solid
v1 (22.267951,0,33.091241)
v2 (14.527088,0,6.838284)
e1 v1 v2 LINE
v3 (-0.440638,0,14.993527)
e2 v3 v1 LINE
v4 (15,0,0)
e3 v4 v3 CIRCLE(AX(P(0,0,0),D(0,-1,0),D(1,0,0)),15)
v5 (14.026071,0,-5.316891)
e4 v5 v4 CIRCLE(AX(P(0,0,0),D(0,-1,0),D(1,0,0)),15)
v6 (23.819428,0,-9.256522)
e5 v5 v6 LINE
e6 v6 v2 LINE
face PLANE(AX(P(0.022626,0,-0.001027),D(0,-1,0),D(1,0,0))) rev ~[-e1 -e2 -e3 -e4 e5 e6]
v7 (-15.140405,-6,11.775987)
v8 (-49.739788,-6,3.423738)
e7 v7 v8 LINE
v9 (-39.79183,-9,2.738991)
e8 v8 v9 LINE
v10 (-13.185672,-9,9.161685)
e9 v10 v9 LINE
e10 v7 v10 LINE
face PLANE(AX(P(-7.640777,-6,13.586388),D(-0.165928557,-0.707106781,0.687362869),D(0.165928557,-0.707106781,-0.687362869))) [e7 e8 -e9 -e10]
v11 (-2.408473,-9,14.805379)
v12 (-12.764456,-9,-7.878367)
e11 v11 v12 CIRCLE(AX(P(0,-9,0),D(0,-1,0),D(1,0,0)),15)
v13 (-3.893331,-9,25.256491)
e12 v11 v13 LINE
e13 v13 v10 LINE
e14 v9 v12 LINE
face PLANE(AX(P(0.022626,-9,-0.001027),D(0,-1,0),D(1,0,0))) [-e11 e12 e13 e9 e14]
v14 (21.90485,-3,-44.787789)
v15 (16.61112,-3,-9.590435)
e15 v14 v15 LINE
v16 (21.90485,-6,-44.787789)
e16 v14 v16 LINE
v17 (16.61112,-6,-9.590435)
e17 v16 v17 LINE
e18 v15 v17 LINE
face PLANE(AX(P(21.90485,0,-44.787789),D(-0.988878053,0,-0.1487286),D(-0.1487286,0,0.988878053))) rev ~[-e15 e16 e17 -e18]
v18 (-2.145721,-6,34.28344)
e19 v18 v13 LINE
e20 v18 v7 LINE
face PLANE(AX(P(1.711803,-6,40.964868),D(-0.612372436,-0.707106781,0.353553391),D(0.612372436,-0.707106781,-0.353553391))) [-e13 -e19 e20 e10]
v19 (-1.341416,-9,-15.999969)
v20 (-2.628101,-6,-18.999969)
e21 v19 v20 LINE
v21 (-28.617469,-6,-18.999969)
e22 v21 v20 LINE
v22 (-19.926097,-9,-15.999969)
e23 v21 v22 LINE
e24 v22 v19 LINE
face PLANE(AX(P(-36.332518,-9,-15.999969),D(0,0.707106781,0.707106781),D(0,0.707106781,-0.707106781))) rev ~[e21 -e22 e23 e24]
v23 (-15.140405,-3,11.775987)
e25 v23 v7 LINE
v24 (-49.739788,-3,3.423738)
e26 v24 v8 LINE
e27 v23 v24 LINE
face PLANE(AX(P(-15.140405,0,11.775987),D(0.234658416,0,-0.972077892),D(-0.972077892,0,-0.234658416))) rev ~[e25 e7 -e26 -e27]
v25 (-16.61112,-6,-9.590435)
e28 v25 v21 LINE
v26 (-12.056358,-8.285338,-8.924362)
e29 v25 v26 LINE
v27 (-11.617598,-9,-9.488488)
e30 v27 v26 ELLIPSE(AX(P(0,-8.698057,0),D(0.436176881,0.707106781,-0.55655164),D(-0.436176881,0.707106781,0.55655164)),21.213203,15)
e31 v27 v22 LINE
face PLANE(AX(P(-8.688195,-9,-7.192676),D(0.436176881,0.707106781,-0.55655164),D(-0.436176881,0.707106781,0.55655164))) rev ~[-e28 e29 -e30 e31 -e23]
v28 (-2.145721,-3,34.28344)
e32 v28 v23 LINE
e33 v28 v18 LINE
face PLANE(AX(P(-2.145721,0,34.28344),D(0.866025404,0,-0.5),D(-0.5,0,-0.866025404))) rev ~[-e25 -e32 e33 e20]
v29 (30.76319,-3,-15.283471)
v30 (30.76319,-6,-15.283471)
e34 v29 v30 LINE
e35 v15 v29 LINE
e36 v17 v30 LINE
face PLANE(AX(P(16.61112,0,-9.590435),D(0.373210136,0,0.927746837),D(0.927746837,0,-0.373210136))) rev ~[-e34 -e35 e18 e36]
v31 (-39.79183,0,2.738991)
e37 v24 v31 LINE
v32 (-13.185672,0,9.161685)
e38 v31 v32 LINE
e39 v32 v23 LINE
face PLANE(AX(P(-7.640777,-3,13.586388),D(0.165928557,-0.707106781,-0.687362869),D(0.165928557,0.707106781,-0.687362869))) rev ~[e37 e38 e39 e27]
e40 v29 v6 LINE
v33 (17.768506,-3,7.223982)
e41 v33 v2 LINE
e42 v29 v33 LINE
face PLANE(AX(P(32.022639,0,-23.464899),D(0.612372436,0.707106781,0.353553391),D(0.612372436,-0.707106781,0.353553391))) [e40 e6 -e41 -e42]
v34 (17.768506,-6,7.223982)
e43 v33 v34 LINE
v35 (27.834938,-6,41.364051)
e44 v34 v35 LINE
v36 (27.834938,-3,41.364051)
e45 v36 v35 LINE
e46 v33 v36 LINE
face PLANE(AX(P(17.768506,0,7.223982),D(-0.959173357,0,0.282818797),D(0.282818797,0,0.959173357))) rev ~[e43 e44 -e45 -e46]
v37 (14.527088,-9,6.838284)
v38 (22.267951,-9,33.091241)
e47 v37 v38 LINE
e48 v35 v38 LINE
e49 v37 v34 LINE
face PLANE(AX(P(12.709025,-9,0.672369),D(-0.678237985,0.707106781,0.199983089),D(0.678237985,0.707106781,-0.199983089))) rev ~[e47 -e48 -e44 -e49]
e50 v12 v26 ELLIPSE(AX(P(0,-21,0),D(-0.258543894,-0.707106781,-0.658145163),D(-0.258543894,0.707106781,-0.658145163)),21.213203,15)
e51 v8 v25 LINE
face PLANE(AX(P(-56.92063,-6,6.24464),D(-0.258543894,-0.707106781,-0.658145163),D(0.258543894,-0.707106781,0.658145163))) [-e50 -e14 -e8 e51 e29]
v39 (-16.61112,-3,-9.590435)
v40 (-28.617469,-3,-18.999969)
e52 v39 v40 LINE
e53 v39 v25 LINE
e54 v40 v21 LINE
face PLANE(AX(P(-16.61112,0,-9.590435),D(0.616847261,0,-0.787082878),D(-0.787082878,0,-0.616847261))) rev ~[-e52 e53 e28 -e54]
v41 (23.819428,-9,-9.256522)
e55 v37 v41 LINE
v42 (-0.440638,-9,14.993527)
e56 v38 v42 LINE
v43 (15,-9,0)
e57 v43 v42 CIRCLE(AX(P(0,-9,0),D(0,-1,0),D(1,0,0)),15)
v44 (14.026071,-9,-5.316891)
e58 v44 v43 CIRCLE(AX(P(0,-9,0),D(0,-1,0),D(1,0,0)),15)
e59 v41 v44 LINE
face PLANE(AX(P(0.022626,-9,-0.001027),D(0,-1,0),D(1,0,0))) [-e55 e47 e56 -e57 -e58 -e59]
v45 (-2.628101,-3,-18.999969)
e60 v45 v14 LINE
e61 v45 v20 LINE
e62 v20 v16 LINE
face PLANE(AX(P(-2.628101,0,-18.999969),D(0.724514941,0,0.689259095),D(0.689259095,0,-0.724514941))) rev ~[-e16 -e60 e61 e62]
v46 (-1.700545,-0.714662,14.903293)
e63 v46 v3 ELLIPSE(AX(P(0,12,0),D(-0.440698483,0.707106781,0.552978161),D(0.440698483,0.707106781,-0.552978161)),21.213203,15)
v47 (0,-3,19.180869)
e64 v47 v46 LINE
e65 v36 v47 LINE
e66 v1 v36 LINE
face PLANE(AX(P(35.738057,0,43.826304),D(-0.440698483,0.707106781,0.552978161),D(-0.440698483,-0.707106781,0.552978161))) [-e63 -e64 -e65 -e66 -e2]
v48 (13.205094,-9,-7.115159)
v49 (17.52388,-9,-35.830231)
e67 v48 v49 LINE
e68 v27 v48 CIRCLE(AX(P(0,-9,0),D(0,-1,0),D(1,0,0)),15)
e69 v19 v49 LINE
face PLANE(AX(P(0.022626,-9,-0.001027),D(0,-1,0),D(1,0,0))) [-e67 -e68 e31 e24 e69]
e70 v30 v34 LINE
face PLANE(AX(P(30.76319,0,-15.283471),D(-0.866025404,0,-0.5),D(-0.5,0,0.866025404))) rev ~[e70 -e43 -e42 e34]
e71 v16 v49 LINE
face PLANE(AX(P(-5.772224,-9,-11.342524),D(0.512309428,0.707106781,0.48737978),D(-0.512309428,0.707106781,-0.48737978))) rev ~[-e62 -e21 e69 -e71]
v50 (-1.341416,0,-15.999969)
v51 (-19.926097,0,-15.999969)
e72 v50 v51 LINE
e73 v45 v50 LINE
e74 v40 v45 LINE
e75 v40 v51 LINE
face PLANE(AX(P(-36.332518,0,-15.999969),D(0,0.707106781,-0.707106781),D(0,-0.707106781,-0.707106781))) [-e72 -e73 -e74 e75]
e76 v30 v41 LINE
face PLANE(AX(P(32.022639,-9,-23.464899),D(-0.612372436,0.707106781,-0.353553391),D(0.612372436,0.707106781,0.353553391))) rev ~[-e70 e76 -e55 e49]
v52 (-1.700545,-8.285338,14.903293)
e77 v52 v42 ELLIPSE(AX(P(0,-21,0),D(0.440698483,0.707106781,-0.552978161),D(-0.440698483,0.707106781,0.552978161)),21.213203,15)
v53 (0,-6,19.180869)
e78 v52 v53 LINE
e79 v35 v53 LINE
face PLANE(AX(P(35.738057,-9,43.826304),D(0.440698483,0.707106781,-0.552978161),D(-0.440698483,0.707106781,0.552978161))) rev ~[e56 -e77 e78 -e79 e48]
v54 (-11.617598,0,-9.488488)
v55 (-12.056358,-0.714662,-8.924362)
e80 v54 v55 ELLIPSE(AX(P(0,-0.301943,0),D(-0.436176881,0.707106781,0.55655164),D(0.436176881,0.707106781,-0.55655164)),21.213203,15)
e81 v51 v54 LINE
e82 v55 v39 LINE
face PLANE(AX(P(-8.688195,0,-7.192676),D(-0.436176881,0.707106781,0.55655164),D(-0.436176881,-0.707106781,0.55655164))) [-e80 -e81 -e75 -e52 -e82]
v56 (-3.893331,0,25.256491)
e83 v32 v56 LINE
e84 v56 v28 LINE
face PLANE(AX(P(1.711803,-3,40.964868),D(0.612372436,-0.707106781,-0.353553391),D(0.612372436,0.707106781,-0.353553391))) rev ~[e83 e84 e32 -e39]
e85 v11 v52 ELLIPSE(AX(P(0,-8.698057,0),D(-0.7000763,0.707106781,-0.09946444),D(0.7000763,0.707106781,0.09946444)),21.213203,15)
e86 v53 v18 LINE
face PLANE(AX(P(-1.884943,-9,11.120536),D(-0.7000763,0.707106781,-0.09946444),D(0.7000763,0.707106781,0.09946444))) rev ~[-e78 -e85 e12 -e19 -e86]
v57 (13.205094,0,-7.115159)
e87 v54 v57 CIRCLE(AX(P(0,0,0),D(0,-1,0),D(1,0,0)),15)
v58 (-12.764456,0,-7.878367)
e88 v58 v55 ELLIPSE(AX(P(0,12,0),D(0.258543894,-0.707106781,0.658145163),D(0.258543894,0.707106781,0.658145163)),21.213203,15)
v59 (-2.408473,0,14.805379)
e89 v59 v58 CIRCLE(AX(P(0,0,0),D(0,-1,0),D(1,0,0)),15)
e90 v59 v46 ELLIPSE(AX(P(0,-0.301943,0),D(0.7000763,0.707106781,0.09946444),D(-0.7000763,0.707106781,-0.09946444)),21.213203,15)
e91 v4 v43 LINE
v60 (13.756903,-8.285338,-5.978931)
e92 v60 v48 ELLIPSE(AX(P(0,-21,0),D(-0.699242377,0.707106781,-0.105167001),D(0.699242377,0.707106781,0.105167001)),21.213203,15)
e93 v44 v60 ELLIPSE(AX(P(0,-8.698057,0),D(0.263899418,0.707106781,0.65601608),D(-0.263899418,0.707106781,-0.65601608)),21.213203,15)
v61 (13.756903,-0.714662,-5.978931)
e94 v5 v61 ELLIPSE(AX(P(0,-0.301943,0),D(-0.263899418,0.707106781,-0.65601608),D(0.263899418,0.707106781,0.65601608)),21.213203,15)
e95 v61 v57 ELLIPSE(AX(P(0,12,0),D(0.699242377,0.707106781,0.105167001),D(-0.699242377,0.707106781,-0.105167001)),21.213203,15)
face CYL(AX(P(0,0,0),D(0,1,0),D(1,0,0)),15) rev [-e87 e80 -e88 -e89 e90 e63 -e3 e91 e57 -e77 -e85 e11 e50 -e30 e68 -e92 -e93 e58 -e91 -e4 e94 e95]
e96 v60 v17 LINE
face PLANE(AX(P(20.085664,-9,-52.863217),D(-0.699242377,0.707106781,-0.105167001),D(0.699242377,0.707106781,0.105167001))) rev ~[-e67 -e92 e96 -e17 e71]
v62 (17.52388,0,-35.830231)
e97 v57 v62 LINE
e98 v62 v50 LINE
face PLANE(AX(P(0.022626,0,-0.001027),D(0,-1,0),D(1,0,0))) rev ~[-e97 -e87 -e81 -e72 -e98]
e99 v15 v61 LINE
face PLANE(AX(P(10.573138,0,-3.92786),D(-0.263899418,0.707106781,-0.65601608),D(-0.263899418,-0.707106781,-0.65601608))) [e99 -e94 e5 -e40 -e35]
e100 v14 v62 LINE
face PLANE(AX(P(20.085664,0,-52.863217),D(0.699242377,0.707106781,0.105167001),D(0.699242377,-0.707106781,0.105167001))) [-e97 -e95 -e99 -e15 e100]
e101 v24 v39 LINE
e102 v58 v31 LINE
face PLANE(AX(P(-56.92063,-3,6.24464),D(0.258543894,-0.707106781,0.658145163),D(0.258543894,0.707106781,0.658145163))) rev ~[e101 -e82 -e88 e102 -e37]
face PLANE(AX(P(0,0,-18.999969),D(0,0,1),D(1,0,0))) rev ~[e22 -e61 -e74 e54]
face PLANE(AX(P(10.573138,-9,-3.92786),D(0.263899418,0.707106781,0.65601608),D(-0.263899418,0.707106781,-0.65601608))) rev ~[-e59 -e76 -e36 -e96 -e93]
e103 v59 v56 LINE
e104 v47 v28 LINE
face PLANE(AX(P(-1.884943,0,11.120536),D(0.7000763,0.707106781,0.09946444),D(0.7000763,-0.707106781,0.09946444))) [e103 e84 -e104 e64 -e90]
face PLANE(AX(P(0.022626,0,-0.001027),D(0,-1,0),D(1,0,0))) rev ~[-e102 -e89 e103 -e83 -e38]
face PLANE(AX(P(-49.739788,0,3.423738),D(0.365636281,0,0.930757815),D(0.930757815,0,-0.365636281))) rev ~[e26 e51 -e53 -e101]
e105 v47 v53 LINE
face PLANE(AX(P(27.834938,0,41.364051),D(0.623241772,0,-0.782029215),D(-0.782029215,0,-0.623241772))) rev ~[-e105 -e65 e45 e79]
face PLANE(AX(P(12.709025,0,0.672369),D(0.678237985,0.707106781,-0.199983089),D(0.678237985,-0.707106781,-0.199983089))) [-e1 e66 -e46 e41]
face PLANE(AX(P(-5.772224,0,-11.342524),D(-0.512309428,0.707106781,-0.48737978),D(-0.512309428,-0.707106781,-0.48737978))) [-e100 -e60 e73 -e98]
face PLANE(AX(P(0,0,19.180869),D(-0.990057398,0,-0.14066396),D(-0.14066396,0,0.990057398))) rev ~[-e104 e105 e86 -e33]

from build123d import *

# Parameters (mm, degrees)
F0_R          = 15
F1_DEPTH      = 9
F2_DEPTH      = 9
F3_T4_DEPTH   = 41.4194656766
F3_T9_DEPTH   = 51.0233182668
F3_T14_DEPTH  = 51.0233182668
F3_T19_DEPTH  = 30.6843352159
F3_T24_DEPTH  = 41.4194656766
F3_T29_DEPTH  = 51.0233182668
F3_T34_DEPTH  = 51.0233182668
F3_T39_DEPTH  = 30.6843352159
F3_T44_DEPTH  = 41.4194656766
F3_T49_DEPTH  = 51.0233182668
F3_T54_DEPTH  = 51.0233182668
F3_T59_DEPTH  = 30.6843352159
F3_T64_DEPTH  = 51.0233182668
F3_T69_DEPTH  = 41.4194656766
F3_T74_DEPTH  = 51.0233182668
F3_T79_DEPTH  = 51.0233182668
F3_T84_DEPTH  = 41.4194656766
F3_T89_DEPTH  = 30.6843352159
F3_T94_DEPTH  = 51.0233182668
F3_T99_DEPTH  = 51.0233182668
F3_T104_DEPTH = 41.4194656766
F3_T109_DEPTH = 51.0233182668
F3_T114_DEPTH = 30.6843352159
F3_T119_DEPTH = 30.6843352159
F3_T125_DEPTH = 51.0233182668
F3_T129_DEPTH = 41.4194656766
F3_T136_DEPTH = 51.0233182668
F3_T140_DEPTH = 30.6843352159
F3_T147_DEPTH = 41.4194656766
F3_T151_DEPTH = 51.0233182668
F3_T158_DEPTH = 51.0233182668
F3_T162_DEPTH = 30.6843352159
F3_T169_DEPTH = 41.4194656766
F3_T173_DEPTH = 51.0233182668
F3_T180_DEPTH = 51.0233182668
F3_T184_DEPTH = 30.6843352159
F3_T191_DEPTH = 41.4194656766
F3_T195_DEPTH = 51.0233182668
F3_T202_DEPTH = 51.0233182668
F3_T206_DEPTH = 30.6843352159
F3_T213_DEPTH = 41.4194656766
F3_T217_DEPTH = 51.0233182668
F3_T224_DEPTH = 51.0233182668
F3_T228_DEPTH = 30.6843352159
F3_T235_DEPTH = 51.0233182668
F3_T239_DEPTH = 41.4194656766
F3_T246_DEPTH = 51.0233182668
F3_T250_DEPTH = 30.6843352159


# Not quite as in the source:
# - a fillet or chamfer that OpenCascade refuses, or shapes differently, is made with other operations: its cross-section is extruded or revolved along the edge and cut away or added


with BuildPart() as f1:
    # F0 (on Front) → F1 (new body)
    with BuildSketch(Plane.XZ):
        with BuildLine():
            ThreePointArc((-16.6111198958, -9.5904345434), (-19.1355906319, 1.3171598584), (-15.1404052923, 11.7759868593))
            Line((-15.1404052923, 11.7759868593), (-49.7397878859, 3.4237381657))
            Line((-49.7397878859, 3.4237381657), (-16.6111198958, -9.5904345434))
        make_face()
        with BuildLine():
            ThreePointArc((0, 19.1808690868), (10.7084892142, 15.9133276745), (17.7685064209, 7.2239821771))
            Line((17.7685064209, 7.2239821771), (27.8349381703, 41.3640508052))
            Line((27.8349381703, 41.3640508052), (0, 19.1808690868))
        make_face()
        with BuildLine():
            Line((21.9048497156, -44.7877889709), (16.6111198958, -9.5904345434))
            ThreePointArc((16.6111198958, -9.5904345434), (8.4271014177, -17.2304875329), (-2.6281011286, -18.9999690364))
            Line((-2.6281011286, -18.9999690364), (21.9048497156, -44.7877889709))
        make_face()
        with BuildLine():
            ThreePointArc((16.6111198958, -9.5904345434), (18.5272968216, -4.9643742213), (19.1808690868, 0))
            ThreePointArc((19.1808690868, 0), (18.8244672495, 3.6803765702), (17.7685064209, 7.2239821771))
            ThreePointArc((17.7685064209, 7.2239821771), (10.7084892142, 15.9133276745), (0, 19.1808690868))
            ThreePointArc((0, 19.1808690868), (-8.4271014177, 17.2304875329), (-15.1404052923, 11.7759868593))
            ThreePointArc((-15.1404052923, 11.7759868593), (-19.1355906319, 1.3171598584), (-16.6111198958, -9.5904345434))
            ThreePointArc((-16.6111198958, -9.5904345434), (-10.7084892142, -15.9133276745), (-2.6281011286, -18.9999690364))
            ThreePointArc((-2.6281011286, -18.9999690364), (8.4271014177, -17.2304875329), (16.6111198958, -9.5904345434))
        make_face()
        Circle(F0_R, mode=Mode.SUBTRACT)
    extrude(amount=F1_DEPTH)

    # F0 (on Front) → F2 (join)
    with BuildSketch(Plane.XZ):
        with BuildLine():
            ThreePointArc((16.6111198958, -9.5904345434), (18.5272968216, -4.9643742213), (19.1808690868, 0))
            ThreePointArc((19.1808690868, 0), (18.8244672495, 3.6803765702), (17.7685064209, 7.2239821771))
            ThreePointArc((17.7685064209, 7.2239821771), (10.7084892142, 15.9133276745), (0, 19.1808690868))
            ThreePointArc((0, 19.1808690868), (-8.4271014177, 17.2304875329), (-15.1404052923, 11.7759868593))
            ThreePointArc((-15.1404052923, 11.7759868593), (-19.1355906319, 1.3171598584), (-16.6111198958, -9.5904345434))
            ThreePointArc((-16.6111198958, -9.5904345434), (-10.7084892142, -15.9133276745), (-2.6281011286, -18.9999690364))
            ThreePointArc((-2.6281011286, -18.9999690364), (8.4271014177, -17.2304875329), (16.6111198958, -9.5904345434))
        make_face()
        Circle(F0_R, mode=Mode.SUBTRACT)
        with BuildLine():
            ThreePointArc((17.7685064209, 7.2239821771), (18.8244672495, 3.6803765702), (19.1808690868, 0))
            ThreePointArc((19.1808690868, 0), (18.5272968216, -4.9643742213), (16.6111198958, -9.5904345434))
            Line((16.6111198958, -9.5904345434), (30.7631902953, -15.2834705217))
            Line((30.7631902953, -15.2834705217), (17.7685064209, 7.2239821771))
        make_face()
        with BuildLine():
            ThreePointArc((0, 19.1808690868), (10.7084892142, 15.9133276745), (17.7685064209, 7.2239821771))
            Line((17.7685064209, 7.2239821771), (27.8349381703, 41.3640508052))
            Line((27.8349381703, 41.3640508052), (0, 19.1808690868))
        make_face()
        with BuildLine():
            Line((21.9048497156, -44.7877889709), (16.6111198958, -9.5904345434))
            ThreePointArc((16.6111198958, -9.5904345434), (8.4271014177, -17.2304875329), (-2.6281011286, -18.9999690364))
            Line((-2.6281011286, -18.9999690364), (21.9048497156, -44.7877889709))
        make_face()
        with BuildLine():
            ThreePointArc((-15.1404052923, 11.7759868593), (-8.4271014177, 17.2304875329), (0, 19.1808690868))
            Line((0, 19.1808690868), (-2.1457214179, 34.2834395581))
            Line((-2.1457214179, 34.2834395581), (-15.1404052923, 11.7759868593))
        make_face()
        with BuildLine():
            Line((-28.6174688775, -18.9999690364), (-2.6281011286, -18.9999690364))
            ThreePointArc((-2.6281011286, -18.9999690364), (-10.7084892142, -15.9133276745), (-16.6111198958, -9.5904345434))
            Line((-16.6111198958, -9.5904345434), (-28.6174688775, -18.9999690364))
        make_face()
        with BuildLine():
            ThreePointArc((-16.6111198958, -9.5904345434), (-19.1355906319, 1.3171598584), (-15.1404052923, 11.7759868593))
            Line((-15.1404052923, 11.7759868593), (-49.7397878859, 3.4237381657))
            Line((-49.7397878859, 3.4237381657), (-16.6111198958, -9.5904345434))
        make_face()
    extrude(amount=F2_DEPTH)

    # F3: chamfer of 3 on 24 edges, made by hand


with BuildPart() as f3_tool2:
    # F3_s3 → F3_t4 (new body)
    with BuildSketch(Plane(origin=(18.1662589207, 0, 31.4648834341), x_dir=(0, 1, 0), z_dir=(-0.5, 0, -0.8660254038))):
        Polygon((-6, -18.9999690364), (-9, -15.9999690364), (-9, -18.9999690364), align=None)
    extrude(amount=F3_T4_DEPTH)

    split(bisect_by=Plane(origin=(-3.5198762352, 0, 14.5811683787), x_dir=(0, 1, 0), z_dir=(-0.2346584157, 0, 0.9720778919)), keep=Keep.TOP)


with BuildPart() as f1_1:
    add(f1.part)

    # F3_t1: cut F3_tool2
    add(f3_tool2.part, mode=Mode.SUBTRACT)


with BuildPart() as f3_tool7:
    # F3_s8 → F3_t9 (new body)
    with BuildSketch(Plane(origin=(-4.1209005243, 0, -0.9947803527), x_dir=(0, 1, 0), z_dir=(-0.9720778919, 0, -0.2346584157))):
        Polygon((-6, -15), (-9, -12), (-9, -15), align=None)
    extrude(amount=F3_T9_DEPTH)

    split(bisect_by=Plane(origin=(-16.4544558566, 0, 9.4999845182), x_dir=(0, 1, 0), z_dir=(-0.8660254038, 0, 0.5)), keep=Keep.TOP)


with BuildPart() as f1_2:
    add(f1_1.part)

    # F3_t6: cut F3_tool7
    add(f3_tool7.part, mode=Mode.SUBTRACT)


with BuildPart() as f3_tool12:
    # F3_s13 → F3_t14 (new body)
    with BuildSketch(Plane(origin=(-51.4360857888, 0, 20.2060072), x_dir=(0, 1, 0), z_dir=(0.930757815, 0, -0.3656362809))):
        Polygon((-6, -15), (-9, -12), (-9, -15), align=None)
    extrude(amount=F3_T14_DEPTH)

    split(bisect_by=Plane(origin=(-1.6642890677, 0, 2.1235944635), x_dir=(0, 1, 0), z_dir=(-0.6168472612, 0, 0.7870828777)), keep=Keep.TOP)


with BuildPart() as f1_3:
    add(f1_2.part)

    # F3_t11: cut F3_tool12
    add(f3_tool12.part, mode=Mode.SUBTRACT)


with BuildPart() as f3_tool17:
    # F3_s18 → F3_t19 (new body)
    with BuildSketch(Plane(origin=(-8.8744478881, 0, -6.9550221835), x_dir=(0, 1, 0), z_dir=(-0.7870828777, 0, -0.6168472612))):
        Polygon((-9, 0.3019430054), (-6, -2.6980569946), (-9, -2.6980569946), align=None)
    extrude(amount=F3_T19_DEPTH)

    split(bisect_by=Plane(origin=(-5.4845442131, 0, -13.9613672244), x_dir=(0, 1, 0), z_dir=(-0.3656362809, 0, -0.930757815)), keep=Keep.TOP)


with BuildPart() as f1_4:
    add(f1_3.part)

    # F3_t16: cut F3_tool17
    add(f3_tool17.part, mode=Mode.SUBTRACT)


with BuildPart() as f3_tool22:
    # F3_s23 → F3_t24 (new body)
    with BuildSketch(Plane.YZ.offset(-36.3325178414)):
        Polygon((-9, -15.9999690364), (-6, -18.9999690364), (-9, -18.9999690364), align=None)
    extrude(amount=F3_T24_DEPTH)

    split(bisect_by=Plane(origin=(-10.8677241153, 0, -10.3388864272), x_dir=(0, 1, 0), z_dir=(-0.724514941, 0, -0.6892590951)), keep=Keep.TOP)


with BuildPart() as f1_5:
    add(f1_4.part)

    # F3_t21: cut F3_tool22
    add(f3_tool22.part, mode=Mode.SUBTRACT)


with BuildPart() as f3_tool27:
    # F3_s28 → F3_t29 (new body)
    with BuildSketch(Plane(origin=(2.9219553188, 0, -3.0714143641), x_dir=(0, 1, 0), z_dir=(0.6892590951, 0, -0.724514941))):
        Polygon((-9, -12), (-6, -15), (-9, -15), align=None)
    extrude(amount=F3_T29_DEPTH)

    split(bisect_by=Plane.XY.offset(-18.9999690364), keep=Keep.BOTTOM)


with BuildPart() as f1_6:
    add(f1_5.part)

    # F3_t26: cut F3_tool27
    add(f3_tool27.part, mode=Mode.SUBTRACT)


with BuildPart() as f3_tool32:
    # F3_s33 → F3_t34 (new body)
    with BuildSketch(Plane(origin=(8.2191273501, 0, -54.6479605643), x_dir=(0, 1, 0), z_dir=(-0.1487285997, 0, 0.988878053))):
        Polygon((-9, -12), (-6, -15), (-9, -15), align=None)
    extrude(amount=F3_T34_DEPTH)

    split(bisect_by=Plane(origin=(-1.0069422189, 0, -2.5031138436), x_dir=(0, 1, 0), z_dir=(-0.3732101364, 0, -0.9277468373)), keep=Keep.TOP)


with BuildPart() as f1_7:
    add(f1_6.part)

    # F3_t31: cut F3_tool32
    add(f3_tool32.part, mode=Mode.SUBTRACT)


with BuildPart() as f3_tool37:
    # F3_s38 → F3_t39 (new body)
    with BuildSketch(Plane(origin=(10.4604498388, 0, -4.207986224), x_dir=(0, 1, 0), z_dir=(0.9277468373, 0, -0.3732101364))):
        Polygon((-9, 0.3019430054), (-6, -2.6980569946), (-9, -2.6980569946), align=None)
    extrude(amount=F3_T39_DEPTH)

    split(bisect_by=Plane(origin=(14.8331707944, 0, 2.2309289955), x_dir=(0, 1, 0), z_dir=(0.988878053, 0, 0.1487285997)), keep=Keep.TOP)


with BuildPart() as f1_8:
    add(f1_7.part)

    # F3_t36: cut F3_tool37
    add(f3_tool37.part, mode=Mode.SUBTRACT)


with BuildPart() as f3_tool42:
    # F3_s43 → F3_t44 (new body)
    with BuildSketch(Plane(origin=(18.1662589207, 0, -31.4648834341), x_dir=(0, 1, 0), z_dir=(-0.5, 0, 0.8660254038))):
        Polygon((-9, -15.9999690364), (-6, -18.9999690364), (-9, -18.9999690364), align=None)
    extrude(amount=F3_T44_DEPTH)

    split(bisect_by=Plane(origin=(14.3876003504, 0, -4.2422819515), x_dir=(0, 1, 0), z_dir=(0.9591733567, 0, -0.2828187968)), keep=Keep.TOP)


with BuildPart() as f1_9:
    add(f1_8.part)

    # F3_t41: cut F3_tool42
    add(f3_tool42.part, mode=Mode.SUBTRACT)


with BuildPart() as f3_tool47:
    # F3_s48 → F3_t49 (new body)
    with BuildSketch(Plane(origin=(1.1989452055, 0, 4.0661947169), x_dir=(0, 1, 0), z_dir=(0.2828187968, 0, 0.9591733567))):
        Polygon((-9, -12), (-6, -15), (-9, -15), align=None)
    extrude(amount=F3_T49_DEPTH)

    split(bisect_by=Plane(origin=(16.4544558566, 0, 9.4999845182), x_dir=(0, 1, 0), z_dir=(0.8660254038, 0, 0.5)), keep=Keep.TOP)


with BuildPart() as f1_10:
    add(f1_9.part)

    # F3_t46: cut F3_tool47
    add(f3_tool47.part, mode=Mode.SUBTRACT)


with BuildPart() as f3_tool52:
    # F3_s53 → F3_t54 (new body)
    with BuildSketch(Plane(origin=(43.2169584386, 0, 34.4419533643), x_dir=(0, 1, 0), z_dir=(-0.7820292153, 0, -0.6232417721))):
        Polygon((-9, -12), (-6, -15), (-9, -15), align=None)
    extrude(amount=F3_T54_DEPTH)

    split(bisect_by=Plane(origin=(2.6712312866, 0, 0.3795193801), x_dir=(0, 1, 0), z_dir=(0.9900573976, 0, 0.1406639596)), keep=Keep.TOP)


with BuildPart() as f1_11:
    add(f1_10.part)

    # F3_t51: cut F3_tool52
    add(f3_tool52.part, mode=Mode.SUBTRACT)


with BuildPart() as f3_tool57:
    # F3_s58 → F3_t59 (new body)
    with BuildSketch(Plane(origin=(-1.5860019507, 0, 11.1630084074), x_dir=(0, 1, 0), z_dir=(-0.1406639596, 0, 0.9900573976))):
        Polygon((-9, 0.3019430054), (-6, -2.6980569946), (-9, -2.6980569946), align=None)
    extrude(amount=F3_T59_DEPTH)

    split(bisect_by=Plane(origin=(-9.3486265813, 0, 11.7304382289), x_dir=(0, 1, 0), z_dir=(-0.6232417721, 0, 0.7820292153)), keep=Keep.TOP)


with BuildPart() as f1_12:
    add(f1_11.part)

    # F3_t56: cut F3_tool57
    add(f3_tool57.part, mode=Mode.SUBTRACT)


with BuildPart() as f3_tool62:
    # F3_s63 → F3_t64 (new body)
    with BuildSketch(Plane(origin=(1.1989452055, 0, 4.0661947169), x_dir=(0, 1, 0), z_dir=(0.2828187968, 0, 0.9591733567))):
        Polygon((0, -12), (-3, -15), (0, -15), align=None)
    extrude(amount=F3_T64_DEPTH)

    split(bisect_by=Plane(origin=(16.4544558566, 0, 9.4999845182), x_dir=(0, 1, 0), z_dir=(0.8660254038, 0, 0.5)), keep=Keep.TOP)


with BuildPart() as f1_13:
    add(f1_12.part)

    # F3_t61: cut F3_tool62
    add(f3_tool62.part, mode=Mode.SUBTRACT)


with BuildPart() as f3_tool67:
    # F3_s68 → F3_t69 (new body)
    with BuildSketch(Plane(origin=(18.1662589207, 0, -31.4648834341), x_dir=(0, 1, 0), z_dir=(-0.5, 0, 0.8660254038))):
        Polygon((0, -15.9999690364), (-3, -18.9999690364), (0, -18.9999690364), align=None)
    extrude(amount=F3_T69_DEPTH)

    split(bisect_by=Plane(origin=(14.3876003504, 0, -4.2422819515), x_dir=(0, 1, 0), z_dir=(0.9591733567, 0, -0.2828187968)), keep=Keep.TOP)


with BuildPart() as f1_14:
    add(f1_13.part)

    # F3_t66: cut F3_tool67
    add(f3_tool67.part, mode=Mode.SUBTRACT)


with BuildPart() as f3_tool72:
    # F3_s73 → F3_t74 (new body)
    with BuildSketch(Plane(origin=(8.2191273501, 0, -54.6479605643), x_dir=(0, 1, 0), z_dir=(-0.1487285997, 0, 0.988878053))):
        Polygon((0, -12), (-3, -15), (0, -15), align=None)
    extrude(amount=F3_T74_DEPTH)

    split(bisect_by=Plane(origin=(-1.0069422189, 0, -2.5031138436), x_dir=(0, 1, 0), z_dir=(-0.3732101364, 0, -0.9277468373)), keep=Keep.TOP)


with BuildPart() as f1_15:
    add(f1_14.part)

    # F3_t71: cut F3_tool72
    add(f3_tool72.part, mode=Mode.SUBTRACT)


with BuildPart() as f3_tool77:
    # F3_s78 → F3_t79 (new body)
    with BuildSketch(Plane(origin=(2.9219553188, 0, -3.0714143641), x_dir=(0, 1, 0), z_dir=(0.6892590951, 0, -0.724514941))):
        Polygon((0, -12), (-3, -15), (0, -15), align=None)
    extrude(amount=F3_T79_DEPTH)

    split(bisect_by=Plane.XY.offset(-18.9999690364), keep=Keep.BOTTOM)


with BuildPart() as f1_16:
    add(f1_15.part)

    # F3_t76: cut F3_tool77
    add(f3_tool77.part, mode=Mode.SUBTRACT)


with BuildPart() as f3_tool82:
    # F3_s83 → F3_t84 (new body)
    with BuildSketch(Plane.YZ.offset(-36.3325178414)):
        Polygon((0, -15.9999690364), (-3, -18.9999690364), (0, -18.9999690364), align=None)
    extrude(amount=F3_T84_DEPTH)

    split(bisect_by=Plane(origin=(-10.8677241153, 0, -10.3388864272), x_dir=(0, 1, 0), z_dir=(-0.724514941, 0, -0.6892590951)), keep=Keep.TOP)


with BuildPart() as f1_17:
    add(f1_16.part)

    # F3_t81: cut F3_tool82
    add(f3_tool82.part, mode=Mode.SUBTRACT)


with BuildPart() as f3_tool87:
    # F3_s88 → F3_t89 (new body)
    with BuildSketch(Plane(origin=(-8.8744478881, 0, -6.9550221835), x_dir=(0, 1, 0), z_dir=(-0.7870828777, 0, -0.6168472612))):
        Polygon((0, 0.3019430054), (-3, -2.6980569946), (0, -2.6980569946), align=None)
    extrude(amount=F3_T89_DEPTH)

    split(bisect_by=Plane(origin=(-5.4845442131, 0, -13.9613672244), x_dir=(0, 1, 0), z_dir=(-0.3656362809, 0, -0.930757815)), keep=Keep.TOP)


with BuildPart() as f1_18:
    add(f1_17.part)

    # F3_t86: cut F3_tool87
    add(f3_tool87.part, mode=Mode.SUBTRACT)


with BuildPart() as f3_tool92:
    # F3_s93 → F3_t94 (new body)
    with BuildSketch(Plane(origin=(-51.4360857888, 0, 20.2060072), x_dir=(0, 1, 0), z_dir=(0.930757815, 0, -0.3656362809))):
        Polygon((-3, -15), (0, -12), (0, -15), align=None)
    extrude(amount=F3_T94_DEPTH)

    split(bisect_by=Plane(origin=(-1.6642890677, 0, 2.1235944635), x_dir=(0, 1, 0), z_dir=(-0.6168472612, 0, 0.7870828777)), keep=Keep.TOP)


with BuildPart() as f1_19:
    add(f1_18.part)

    # F3_t91: cut F3_tool92
    add(f3_tool92.part, mode=Mode.SUBTRACT)


with BuildPart() as f3_tool97:
    # F3_s98 → F3_t99 (new body)
    with BuildSketch(Plane(origin=(-4.1209005243, 0, -0.9947803527), x_dir=(0, 1, 0), z_dir=(-0.9720778919, 0, -0.2346584157))):
        Polygon((-3, -15), (0, -12), (0, -15), align=None)
    extrude(amount=F3_T99_DEPTH)

    split(bisect_by=Plane(origin=(-16.4544558566, 0, 9.4999845182), x_dir=(0, 1, 0), z_dir=(-0.8660254038, 0, 0.5)), keep=Keep.TOP)


with BuildPart() as f1_20:
    add(f1_19.part)

    # F3_t96: cut F3_tool97
    add(f3_tool97.part, mode=Mode.SUBTRACT)


with BuildPart() as f3_tool102:
    # F3_s103 → F3_t104 (new body)
    with BuildSketch(Plane(origin=(18.1662589207, 0, 31.4648834341), x_dir=(0, 1, 0), z_dir=(-0.5, 0, -0.8660254038))):
        Polygon((-3, -18.9999690364), (0, -15.9999690364), (0, -18.9999690364), align=None)
    extrude(amount=F3_T104_DEPTH)

    split(bisect_by=Plane(origin=(-3.5198762352, 0, 14.5811683787), x_dir=(0, 1, 0), z_dir=(-0.2346584157, 0, 0.9720778919)), keep=Keep.TOP)


with BuildPart() as f1_21:
    add(f1_20.part)

    # F3_t101: cut F3_tool102
    add(f3_tool102.part, mode=Mode.SUBTRACT)


with BuildPart() as f3_tool107:
    # F3_s108 → F3_t109 (new body)
    with BuildSketch(Plane(origin=(43.2169584386, 0, 34.4419533643), x_dir=(0, 1, 0), z_dir=(-0.7820292153, 0, -0.6232417721))):
        Polygon((0, -12), (-3, -15), (0, -15), align=None)
    extrude(amount=F3_T109_DEPTH)

    split(bisect_by=Plane(origin=(2.6712312866, 0, 0.3795193801), x_dir=(0, 1, 0), z_dir=(0.9900573976, 0, 0.1406639596)), keep=Keep.TOP)


with BuildPart() as f1_22:
    add(f1_21.part)

    # F3_t106: cut F3_tool107
    add(f3_tool107.part, mode=Mode.SUBTRACT)


with BuildPart() as f3_tool112:
    # F3_s113 → F3_t114 (new body)
    with BuildSketch(Plane(origin=(10.4604498388, 0, -4.207986224), x_dir=(0, 1, 0), z_dir=(0.9277468373, 0, -0.3732101364))):
        Polygon((0, 0.3019430054), (-3, -2.6980569946), (0, -2.6980569946), align=None)
    extrude(amount=F3_T114_DEPTH)

    split(bisect_by=Plane(origin=(14.8331707944, 0, 2.2309289955), x_dir=(0, 1, 0), z_dir=(0.988878053, 0, 0.1487285997)), keep=Keep.TOP)


with BuildPart() as f1_23:
    add(f1_22.part)

    # F3_t111: cut F3_tool112
    add(f3_tool112.part, mode=Mode.SUBTRACT)


with BuildPart() as f3_tool117:
    # F3_s118 → F3_t119 (new body)
    with BuildSketch(Plane(origin=(-1.5860019507, 0, 11.1630084074), x_dir=(0, 1, 0), z_dir=(-0.1406639596, 0, 0.9900573976))):
        Polygon((0, 0.3019430054), (-3, -2.6980569946), (0, -2.6980569946), align=None)
    extrude(amount=F3_T119_DEPTH)

    split(bisect_by=Plane(origin=(-9.3486265813, 0, 11.7304382289), x_dir=(0, 1, 0), z_dir=(-0.6232417721, 0, 0.7820292153)), keep=Keep.TOP)


with BuildPart() as f1_24:
    add(f1_23.part)

    # F3_t116: cut F3_tool117
    add(f3_tool117.part, mode=Mode.SUBTRACT)


with BuildPart() as f3_tool123:
    # F3_s124 → F3_t125 (new body)
    with BuildSketch(Plane(origin=(-4.1209005243, 0, -0.9947803527), x_dir=(0, 1, 0), z_dir=(-0.9720778919, 0, -0.2346584157))):
        Polygon((-6, -15), (-9, -12), (-9, -15), align=None)
    extrude(amount=F3_T125_DEPTH)

    split(bisect_by=Plane(origin=(-16.4544558566, 0, 9.4999845182), x_dir=(0, 1, 0), z_dir=(0.8660254038, 0, -0.5)), keep=Keep.TOP)


with BuildPart() as f3_tool127:
    # F3_s128 → F3_t129 (new body)
    with BuildSketch(Plane(origin=(18.1662589207, 0, 31.4648834341), x_dir=(0, 1, 0), z_dir=(-0.5, 0, -0.8660254038))):
        Polygon((-6, -18.9999690364), (-9, -15.9999690364), (-9, -18.9999690364), align=None)
    extrude(amount=F3_T129_DEPTH)

    split(bisect_by=Plane(origin=(-3.5198762352, 0, 14.5811683787), x_dir=(0, 1, 0), z_dir=(0.2346584157, 0, -0.9720778919)), keep=Keep.TOP)


with BuildPart() as f3_tool123_1:
    add(f3_tool123.part)

    # F3_t131: intersect F3_tool127
    add(f3_tool127.part, mode=Mode.INTERSECT)


with BuildPart() as f1_25:
    add(f1_24.part)

    # F3_t121: cut F3_tool123
    add(f3_tool123_1.part, mode=Mode.SUBTRACT)


with BuildPart() as f3_tool134:
    # F3_s135 → F3_t136 (new body)
    with BuildSketch(Plane(origin=(-51.4360857888, 0, 20.2060072), x_dir=(0, 1, 0), z_dir=(0.930757815, 0, -0.3656362809))):
        Polygon((-6, -15), (-9, -12), (-9, -15), align=None)
    extrude(amount=F3_T136_DEPTH)

    split(bisect_by=Plane(origin=(-1.6642890677, 0, 2.1235944635), x_dir=(0, 1, 0), z_dir=(0.6168472612, 0, -0.7870828777)), keep=Keep.TOP)


with BuildPart() as f3_tool138:
    # F3_s139 → F3_t140 (new body)
    with BuildSketch(Plane(origin=(-8.8744478881, 0, -6.9550221835), x_dir=(0, 1, 0), z_dir=(-0.7870828777, 0, -0.6168472612))):
        Polygon((-9, 0.3019430054), (-6, -2.6980569946), (-9, -2.6980569946), align=None)
    extrude(amount=F3_T140_DEPTH)

    split(bisect_by=Plane(origin=(-5.4845442131, 0, -13.9613672244), x_dir=(0, 1, 0), z_dir=(0.3656362809, 0, 0.930757815)), keep=Keep.TOP)


with BuildPart() as f3_tool134_1:
    add(f3_tool134.part)

    # F3_t142: intersect F3_tool138
    add(f3_tool138.part, mode=Mode.INTERSECT)


with BuildPart() as f1_26:
    add(f1_25.part)

    # F3_t132: cut F3_tool134
    add(f3_tool134_1.part, mode=Mode.SUBTRACT)


with BuildPart() as f3_tool145:
    # F3_s146 → F3_t147 (new body)
    with BuildSketch(Plane.YZ.offset(-36.3325178414)):
        Polygon((-9, -15.9999690364), (-6, -18.9999690364), (-9, -18.9999690364), align=None)
    extrude(amount=F3_T147_DEPTH)

    split(bisect_by=Plane(origin=(-10.8677241153, 0, -10.3388864272), x_dir=(0, 1, 0), z_dir=(0.724514941, 0, 0.6892590951)), keep=Keep.TOP)


with BuildPart() as f3_tool149:
    # F3_s150 → F3_t151 (new body)
    with BuildSketch(Plane(origin=(2.9219553188, 0, -3.0714143641), x_dir=(0, 1, 0), z_dir=(0.6892590951, 0, -0.724514941))):
        Polygon((-9, -12), (-6, -15), (-9, -15), align=None)
    extrude(amount=F3_T151_DEPTH)

    split(bisect_by=Plane.XY.offset(-18.9999690364), keep=Keep.TOP)


with BuildPart() as f3_tool145_1:
    add(f3_tool145.part)

    # F3_t153: intersect F3_tool149
    add(f3_tool149.part, mode=Mode.INTERSECT)


with BuildPart() as f1_27:
    add(f1_26.part)

    # F3_t143: cut F3_tool145
    add(f3_tool145_1.part, mode=Mode.SUBTRACT)


with BuildPart() as f3_tool156:
    # F3_s157 → F3_t158 (new body)
    with BuildSketch(Plane(origin=(8.2191273501, 0, -54.6479605643), x_dir=(0, 1, 0), z_dir=(-0.1487285997, 0, 0.988878053))):
        Polygon((-9, -12), (-6, -15), (-9, -15), align=None)
    extrude(amount=F3_T158_DEPTH)

    split(bisect_by=Plane(origin=(-1.0069422189, 0, -2.5031138436), x_dir=(0, 1, 0), z_dir=(0.3732101364, 0, 0.9277468373)), keep=Keep.TOP)


with BuildPart() as f3_tool160:
    # F3_s161 → F3_t162 (new body)
    with BuildSketch(Plane(origin=(10.4604498388, 0, -4.207986224), x_dir=(0, 1, 0), z_dir=(0.9277468373, 0, -0.3732101364))):
        Polygon((-9, 0.3019430054), (-6, -2.6980569946), (-9, -2.6980569946), align=None)
    extrude(amount=F3_T162_DEPTH)

    split(bisect_by=Plane(origin=(14.8331707944, 0, 2.2309289955), x_dir=(0, 1, 0), z_dir=(-0.988878053, 0, -0.1487285997)), keep=Keep.TOP)


with BuildPart() as f3_tool156_1:
    add(f3_tool156.part)

    # F3_t164: intersect F3_tool160
    add(f3_tool160.part, mode=Mode.INTERSECT)


with BuildPart() as f1_28:
    add(f1_27.part)

    # F3_t154: cut F3_tool156
    add(f3_tool156_1.part, mode=Mode.SUBTRACT)


with BuildPart() as f3_tool167:
    # F3_s168 → F3_t169 (new body)
    with BuildSketch(Plane(origin=(18.1662589207, 0, -31.4648834341), x_dir=(0, 1, 0), z_dir=(-0.5, 0, 0.8660254038))):
        Polygon((-9, -15.9999690364), (-6, -18.9999690364), (-9, -18.9999690364), align=None)
    extrude(amount=F3_T169_DEPTH)

    split(bisect_by=Plane(origin=(14.3876003504, 0, -4.2422819515), x_dir=(0, 1, 0), z_dir=(-0.9591733567, 0, 0.2828187968)), keep=Keep.TOP)


with BuildPart() as f3_tool171:
    # F3_s172 → F3_t173 (new body)
    with BuildSketch(Plane(origin=(1.1989452055, 0, 4.0661947169), x_dir=(0, 1, 0), z_dir=(0.2828187968, 0, 0.9591733567))):
        Polygon((-9, -12), (-6, -15), (-9, -15), align=None)
    extrude(amount=F3_T173_DEPTH)

    split(bisect_by=Plane(origin=(16.4544558566, 0, 9.4999845182), x_dir=(0, 1, 0), z_dir=(-0.8660254038, 0, -0.5)), keep=Keep.TOP)


with BuildPart() as f3_tool167_1:
    add(f3_tool167.part)

    # F3_t175: intersect F3_tool171
    add(f3_tool171.part, mode=Mode.INTERSECT)


with BuildPart() as f1_29:
    add(f1_28.part)

    # F3_t165: cut F3_tool167
    add(f3_tool167_1.part, mode=Mode.SUBTRACT)


with BuildPart() as f3_tool178:
    # F3_s179 → F3_t180 (new body)
    with BuildSketch(Plane(origin=(43.2169584386, 0, 34.4419533643), x_dir=(0, 1, 0), z_dir=(-0.7820292153, 0, -0.6232417721))):
        Polygon((-9, -12), (-6, -15), (-9, -15), align=None)
    extrude(amount=F3_T180_DEPTH)

    split(bisect_by=Plane(origin=(2.6712312866, 0, 0.3795193801), x_dir=(0, 1, 0), z_dir=(-0.9900573976, 0, -0.1406639596)), keep=Keep.TOP)


with BuildPart() as f3_tool182:
    # F3_s183 → F3_t184 (new body)
    with BuildSketch(Plane(origin=(-1.5860019507, 0, 11.1630084074), x_dir=(0, 1, 0), z_dir=(-0.1406639596, 0, 0.9900573976))):
        Polygon((-9, 0.3019430054), (-6, -2.6980569946), (-9, -2.6980569946), align=None)
    extrude(amount=F3_T184_DEPTH)

    split(bisect_by=Plane(origin=(-9.3486265813, 0, 11.7304382289), x_dir=(0, 1, 0), z_dir=(0.6232417721, 0, -0.7820292153)), keep=Keep.TOP)


with BuildPart() as f3_tool178_1:
    add(f3_tool178.part)

    # F3_t186: intersect F3_tool182
    add(f3_tool182.part, mode=Mode.INTERSECT)


with BuildPart() as f1_30:
    add(f1_29.part)

    # F3_t176: cut F3_tool178
    add(f3_tool178_1.part, mode=Mode.SUBTRACT)


with BuildPart() as f3_tool189:
    # F3_s190 → F3_t191 (new body)
    with BuildSketch(Plane(origin=(18.1662589207, 0, -31.4648834341), x_dir=(0, 1, 0), z_dir=(-0.5, 0, 0.8660254038))):
        Polygon((0, -15.9999690364), (-3, -18.9999690364), (0, -18.9999690364), align=None)
    extrude(amount=F3_T191_DEPTH)

    split(bisect_by=Plane(origin=(14.3876003504, 0, -4.2422819515), x_dir=(0, 1, 0), z_dir=(-0.9591733567, 0, 0.2828187968)), keep=Keep.TOP)


with BuildPart() as f3_tool193:
    # F3_s194 → F3_t195 (new body)
    with BuildSketch(Plane(origin=(1.1989452055, 0, 4.0661947169), x_dir=(0, 1, 0), z_dir=(0.2828187968, 0, 0.9591733567))):
        Polygon((0, -12), (-3, -15), (0, -15), align=None)
    extrude(amount=F3_T195_DEPTH)

    split(bisect_by=Plane(origin=(16.4544558566, 0, 9.4999845182), x_dir=(0, 1, 0), z_dir=(-0.8660254038, 0, -0.5)), keep=Keep.TOP)


with BuildPart() as f3_tool189_1:
    add(f3_tool189.part)

    # F3_t197: intersect F3_tool193
    add(f3_tool193.part, mode=Mode.INTERSECT)


with BuildPart() as f1_31:
    add(f1_30.part)

    # F3_t187: cut F3_tool189
    add(f3_tool189_1.part, mode=Mode.SUBTRACT)


with BuildPart() as f3_tool200:
    # F3_s201 → F3_t202 (new body)
    with BuildSketch(Plane(origin=(8.2191273501, 0, -54.6479605643), x_dir=(0, 1, 0), z_dir=(-0.1487285997, 0, 0.988878053))):
        Polygon((0, -12), (-3, -15), (0, -15), align=None)
    extrude(amount=F3_T202_DEPTH)

    split(bisect_by=Plane(origin=(-1.0069422189, 0, -2.5031138436), x_dir=(0, 1, 0), z_dir=(0.3732101364, 0, 0.9277468373)), keep=Keep.TOP)


with BuildPart() as f3_tool204:
    # F3_s205 → F3_t206 (new body)
    with BuildSketch(Plane(origin=(10.4604498388, 0, -4.207986224), x_dir=(0, 1, 0), z_dir=(0.9277468373, 0, -0.3732101364))):
        Polygon((0, 0.3019430054), (-3, -2.6980569946), (0, -2.6980569946), align=None)
    extrude(amount=F3_T206_DEPTH)

    split(bisect_by=Plane(origin=(14.8331707944, 0, 2.2309289955), x_dir=(0, 1, 0), z_dir=(-0.988878053, 0, -0.1487285997)), keep=Keep.TOP)


with BuildPart() as f3_tool200_1:
    add(f3_tool200.part)

    # F3_t208: intersect F3_tool204
    add(f3_tool204.part, mode=Mode.INTERSECT)


with BuildPart() as f1_32:
    add(f1_31.part)

    # F3_t198: cut F3_tool200
    add(f3_tool200_1.part, mode=Mode.SUBTRACT)


with BuildPart() as f3_tool211:
    # F3_s212 → F3_t213 (new body)
    with BuildSketch(Plane.YZ.offset(-36.3325178414)):
        Polygon((0, -15.9999690364), (-3, -18.9999690364), (0, -18.9999690364), align=None)
    extrude(amount=F3_T213_DEPTH)

    split(bisect_by=Plane(origin=(-10.8677241153, 0, -10.3388864272), x_dir=(0, 1, 0), z_dir=(0.724514941, 0, 0.6892590951)), keep=Keep.TOP)


with BuildPart() as f3_tool215:
    # F3_s216 → F3_t217 (new body)
    with BuildSketch(Plane(origin=(2.9219553188, 0, -3.0714143641), x_dir=(0, 1, 0), z_dir=(0.6892590951, 0, -0.724514941))):
        Polygon((0, -12), (-3, -15), (0, -15), align=None)
    extrude(amount=F3_T217_DEPTH)

    split(bisect_by=Plane.XY.offset(-18.9999690364), keep=Keep.TOP)


with BuildPart() as f3_tool211_1:
    add(f3_tool211.part)

    # F3_t219: intersect F3_tool215
    add(f3_tool215.part, mode=Mode.INTERSECT)


with BuildPart() as f1_33:
    add(f1_32.part)

    # F3_t209: cut F3_tool211
    add(f3_tool211_1.part, mode=Mode.SUBTRACT)


with BuildPart() as f3_tool222:
    # F3_s223 → F3_t224 (new body)
    with BuildSketch(Plane(origin=(-51.4360857888, 0, 20.2060072), x_dir=(0, 1, 0), z_dir=(0.930757815, 0, -0.3656362809))):
        Polygon((-3, -15), (0, -12), (0, -15), align=None)
    extrude(amount=F3_T224_DEPTH)

    split(bisect_by=Plane(origin=(-1.6642890677, 0, 2.1235944635), x_dir=(0, 1, 0), z_dir=(0.6168472612, 0, -0.7870828777)), keep=Keep.TOP)


with BuildPart() as f3_tool226:
    # F3_s227 → F3_t228 (new body)
    with BuildSketch(Plane(origin=(-8.8744478881, 0, -6.9550221835), x_dir=(0, 1, 0), z_dir=(-0.7870828777, 0, -0.6168472612))):
        Polygon((0, 0.3019430054), (-3, -2.6980569946), (0, -2.6980569946), align=None)
    extrude(amount=F3_T228_DEPTH)

    split(bisect_by=Plane(origin=(-5.4845442131, 0, -13.9613672244), x_dir=(0, 1, 0), z_dir=(0.3656362809, 0, 0.930757815)), keep=Keep.TOP)


with BuildPart() as f3_tool222_1:
    add(f3_tool222.part)

    # F3_t230: intersect F3_tool226
    add(f3_tool226.part, mode=Mode.INTERSECT)


with BuildPart() as f1_34:
    add(f1_33.part)

    # F3_t220: cut F3_tool222
    add(f3_tool222_1.part, mode=Mode.SUBTRACT)


with BuildPart() as f3_tool233:
    # F3_s234 → F3_t235 (new body)
    with BuildSketch(Plane(origin=(-4.1209005243, 0, -0.9947803527), x_dir=(0, 1, 0), z_dir=(-0.9720778919, 0, -0.2346584157))):
        Polygon((-3, -15), (0, -12), (0, -15), align=None)
    extrude(amount=F3_T235_DEPTH)

    split(bisect_by=Plane(origin=(-16.4544558566, 0, 9.4999845182), x_dir=(0, 1, 0), z_dir=(0.8660254038, 0, -0.5)), keep=Keep.TOP)


with BuildPart() as f3_tool237:
    # F3_s238 → F3_t239 (new body)
    with BuildSketch(Plane(origin=(18.1662589207, 0, 31.4648834341), x_dir=(0, 1, 0), z_dir=(-0.5, 0, -0.8660254038))):
        Polygon((-3, -18.9999690364), (0, -15.9999690364), (0, -18.9999690364), align=None)
    extrude(amount=F3_T239_DEPTH)

    split(bisect_by=Plane(origin=(-3.5198762352, 0, 14.5811683787), x_dir=(0, 1, 0), z_dir=(0.2346584157, 0, -0.9720778919)), keep=Keep.TOP)


with BuildPart() as f3_tool233_1:
    add(f3_tool233.part)

    # F3_t241: intersect F3_tool237
    add(f3_tool237.part, mode=Mode.INTERSECT)


with BuildPart() as f1_35:
    add(f1_34.part)

    # F3_t231: cut F3_tool233
    add(f3_tool233_1.part, mode=Mode.SUBTRACT)


with BuildPart() as f3_tool244:
    # F3_s245 → F3_t246 (new body)
    with BuildSketch(Plane(origin=(43.2169584386, 0, 34.4419533643), x_dir=(0, 1, 0), z_dir=(-0.7820292153, 0, -0.6232417721))):
        Polygon((0, -12), (-3, -15), (0, -15), align=None)
    extrude(amount=F3_T246_DEPTH)

    split(bisect_by=Plane(origin=(2.6712312866, 0, 0.3795193801), x_dir=(0, 1, 0), z_dir=(-0.9900573976, 0, -0.1406639596)), keep=Keep.TOP)


with BuildPart() as f3_tool248:
    # F3_s249 → F3_t250 (new body)
    with BuildSketch(Plane(origin=(-1.5860019507, 0, 11.1630084074), x_dir=(0, 1, 0), z_dir=(-0.1406639596, 0, 0.9900573976))):
        Polygon((0, 0.3019430054), (-3, -2.6980569946), (0, -2.6980569946), align=None)
    extrude(amount=F3_T250_DEPTH)

    split(bisect_by=Plane(origin=(-9.3486265813, 0, 11.7304382289), x_dir=(0, 1, 0), z_dir=(0.6232417721, 0, -0.7820292153)), keep=Keep.TOP)


with BuildPart() as f3_tool244_1:
    add(f3_tool244.part)

    # F3_t252: intersect F3_tool248
    add(f3_tool248.part, mode=Mode.INTERSECT)


with BuildPart() as f1_36:
    add(f1_35.part)

    # F3_t242: cut F3_tool244
    add(f3_tool244_1.part, mode=Mode.SUBTRACT)


solid = f1_36.part
